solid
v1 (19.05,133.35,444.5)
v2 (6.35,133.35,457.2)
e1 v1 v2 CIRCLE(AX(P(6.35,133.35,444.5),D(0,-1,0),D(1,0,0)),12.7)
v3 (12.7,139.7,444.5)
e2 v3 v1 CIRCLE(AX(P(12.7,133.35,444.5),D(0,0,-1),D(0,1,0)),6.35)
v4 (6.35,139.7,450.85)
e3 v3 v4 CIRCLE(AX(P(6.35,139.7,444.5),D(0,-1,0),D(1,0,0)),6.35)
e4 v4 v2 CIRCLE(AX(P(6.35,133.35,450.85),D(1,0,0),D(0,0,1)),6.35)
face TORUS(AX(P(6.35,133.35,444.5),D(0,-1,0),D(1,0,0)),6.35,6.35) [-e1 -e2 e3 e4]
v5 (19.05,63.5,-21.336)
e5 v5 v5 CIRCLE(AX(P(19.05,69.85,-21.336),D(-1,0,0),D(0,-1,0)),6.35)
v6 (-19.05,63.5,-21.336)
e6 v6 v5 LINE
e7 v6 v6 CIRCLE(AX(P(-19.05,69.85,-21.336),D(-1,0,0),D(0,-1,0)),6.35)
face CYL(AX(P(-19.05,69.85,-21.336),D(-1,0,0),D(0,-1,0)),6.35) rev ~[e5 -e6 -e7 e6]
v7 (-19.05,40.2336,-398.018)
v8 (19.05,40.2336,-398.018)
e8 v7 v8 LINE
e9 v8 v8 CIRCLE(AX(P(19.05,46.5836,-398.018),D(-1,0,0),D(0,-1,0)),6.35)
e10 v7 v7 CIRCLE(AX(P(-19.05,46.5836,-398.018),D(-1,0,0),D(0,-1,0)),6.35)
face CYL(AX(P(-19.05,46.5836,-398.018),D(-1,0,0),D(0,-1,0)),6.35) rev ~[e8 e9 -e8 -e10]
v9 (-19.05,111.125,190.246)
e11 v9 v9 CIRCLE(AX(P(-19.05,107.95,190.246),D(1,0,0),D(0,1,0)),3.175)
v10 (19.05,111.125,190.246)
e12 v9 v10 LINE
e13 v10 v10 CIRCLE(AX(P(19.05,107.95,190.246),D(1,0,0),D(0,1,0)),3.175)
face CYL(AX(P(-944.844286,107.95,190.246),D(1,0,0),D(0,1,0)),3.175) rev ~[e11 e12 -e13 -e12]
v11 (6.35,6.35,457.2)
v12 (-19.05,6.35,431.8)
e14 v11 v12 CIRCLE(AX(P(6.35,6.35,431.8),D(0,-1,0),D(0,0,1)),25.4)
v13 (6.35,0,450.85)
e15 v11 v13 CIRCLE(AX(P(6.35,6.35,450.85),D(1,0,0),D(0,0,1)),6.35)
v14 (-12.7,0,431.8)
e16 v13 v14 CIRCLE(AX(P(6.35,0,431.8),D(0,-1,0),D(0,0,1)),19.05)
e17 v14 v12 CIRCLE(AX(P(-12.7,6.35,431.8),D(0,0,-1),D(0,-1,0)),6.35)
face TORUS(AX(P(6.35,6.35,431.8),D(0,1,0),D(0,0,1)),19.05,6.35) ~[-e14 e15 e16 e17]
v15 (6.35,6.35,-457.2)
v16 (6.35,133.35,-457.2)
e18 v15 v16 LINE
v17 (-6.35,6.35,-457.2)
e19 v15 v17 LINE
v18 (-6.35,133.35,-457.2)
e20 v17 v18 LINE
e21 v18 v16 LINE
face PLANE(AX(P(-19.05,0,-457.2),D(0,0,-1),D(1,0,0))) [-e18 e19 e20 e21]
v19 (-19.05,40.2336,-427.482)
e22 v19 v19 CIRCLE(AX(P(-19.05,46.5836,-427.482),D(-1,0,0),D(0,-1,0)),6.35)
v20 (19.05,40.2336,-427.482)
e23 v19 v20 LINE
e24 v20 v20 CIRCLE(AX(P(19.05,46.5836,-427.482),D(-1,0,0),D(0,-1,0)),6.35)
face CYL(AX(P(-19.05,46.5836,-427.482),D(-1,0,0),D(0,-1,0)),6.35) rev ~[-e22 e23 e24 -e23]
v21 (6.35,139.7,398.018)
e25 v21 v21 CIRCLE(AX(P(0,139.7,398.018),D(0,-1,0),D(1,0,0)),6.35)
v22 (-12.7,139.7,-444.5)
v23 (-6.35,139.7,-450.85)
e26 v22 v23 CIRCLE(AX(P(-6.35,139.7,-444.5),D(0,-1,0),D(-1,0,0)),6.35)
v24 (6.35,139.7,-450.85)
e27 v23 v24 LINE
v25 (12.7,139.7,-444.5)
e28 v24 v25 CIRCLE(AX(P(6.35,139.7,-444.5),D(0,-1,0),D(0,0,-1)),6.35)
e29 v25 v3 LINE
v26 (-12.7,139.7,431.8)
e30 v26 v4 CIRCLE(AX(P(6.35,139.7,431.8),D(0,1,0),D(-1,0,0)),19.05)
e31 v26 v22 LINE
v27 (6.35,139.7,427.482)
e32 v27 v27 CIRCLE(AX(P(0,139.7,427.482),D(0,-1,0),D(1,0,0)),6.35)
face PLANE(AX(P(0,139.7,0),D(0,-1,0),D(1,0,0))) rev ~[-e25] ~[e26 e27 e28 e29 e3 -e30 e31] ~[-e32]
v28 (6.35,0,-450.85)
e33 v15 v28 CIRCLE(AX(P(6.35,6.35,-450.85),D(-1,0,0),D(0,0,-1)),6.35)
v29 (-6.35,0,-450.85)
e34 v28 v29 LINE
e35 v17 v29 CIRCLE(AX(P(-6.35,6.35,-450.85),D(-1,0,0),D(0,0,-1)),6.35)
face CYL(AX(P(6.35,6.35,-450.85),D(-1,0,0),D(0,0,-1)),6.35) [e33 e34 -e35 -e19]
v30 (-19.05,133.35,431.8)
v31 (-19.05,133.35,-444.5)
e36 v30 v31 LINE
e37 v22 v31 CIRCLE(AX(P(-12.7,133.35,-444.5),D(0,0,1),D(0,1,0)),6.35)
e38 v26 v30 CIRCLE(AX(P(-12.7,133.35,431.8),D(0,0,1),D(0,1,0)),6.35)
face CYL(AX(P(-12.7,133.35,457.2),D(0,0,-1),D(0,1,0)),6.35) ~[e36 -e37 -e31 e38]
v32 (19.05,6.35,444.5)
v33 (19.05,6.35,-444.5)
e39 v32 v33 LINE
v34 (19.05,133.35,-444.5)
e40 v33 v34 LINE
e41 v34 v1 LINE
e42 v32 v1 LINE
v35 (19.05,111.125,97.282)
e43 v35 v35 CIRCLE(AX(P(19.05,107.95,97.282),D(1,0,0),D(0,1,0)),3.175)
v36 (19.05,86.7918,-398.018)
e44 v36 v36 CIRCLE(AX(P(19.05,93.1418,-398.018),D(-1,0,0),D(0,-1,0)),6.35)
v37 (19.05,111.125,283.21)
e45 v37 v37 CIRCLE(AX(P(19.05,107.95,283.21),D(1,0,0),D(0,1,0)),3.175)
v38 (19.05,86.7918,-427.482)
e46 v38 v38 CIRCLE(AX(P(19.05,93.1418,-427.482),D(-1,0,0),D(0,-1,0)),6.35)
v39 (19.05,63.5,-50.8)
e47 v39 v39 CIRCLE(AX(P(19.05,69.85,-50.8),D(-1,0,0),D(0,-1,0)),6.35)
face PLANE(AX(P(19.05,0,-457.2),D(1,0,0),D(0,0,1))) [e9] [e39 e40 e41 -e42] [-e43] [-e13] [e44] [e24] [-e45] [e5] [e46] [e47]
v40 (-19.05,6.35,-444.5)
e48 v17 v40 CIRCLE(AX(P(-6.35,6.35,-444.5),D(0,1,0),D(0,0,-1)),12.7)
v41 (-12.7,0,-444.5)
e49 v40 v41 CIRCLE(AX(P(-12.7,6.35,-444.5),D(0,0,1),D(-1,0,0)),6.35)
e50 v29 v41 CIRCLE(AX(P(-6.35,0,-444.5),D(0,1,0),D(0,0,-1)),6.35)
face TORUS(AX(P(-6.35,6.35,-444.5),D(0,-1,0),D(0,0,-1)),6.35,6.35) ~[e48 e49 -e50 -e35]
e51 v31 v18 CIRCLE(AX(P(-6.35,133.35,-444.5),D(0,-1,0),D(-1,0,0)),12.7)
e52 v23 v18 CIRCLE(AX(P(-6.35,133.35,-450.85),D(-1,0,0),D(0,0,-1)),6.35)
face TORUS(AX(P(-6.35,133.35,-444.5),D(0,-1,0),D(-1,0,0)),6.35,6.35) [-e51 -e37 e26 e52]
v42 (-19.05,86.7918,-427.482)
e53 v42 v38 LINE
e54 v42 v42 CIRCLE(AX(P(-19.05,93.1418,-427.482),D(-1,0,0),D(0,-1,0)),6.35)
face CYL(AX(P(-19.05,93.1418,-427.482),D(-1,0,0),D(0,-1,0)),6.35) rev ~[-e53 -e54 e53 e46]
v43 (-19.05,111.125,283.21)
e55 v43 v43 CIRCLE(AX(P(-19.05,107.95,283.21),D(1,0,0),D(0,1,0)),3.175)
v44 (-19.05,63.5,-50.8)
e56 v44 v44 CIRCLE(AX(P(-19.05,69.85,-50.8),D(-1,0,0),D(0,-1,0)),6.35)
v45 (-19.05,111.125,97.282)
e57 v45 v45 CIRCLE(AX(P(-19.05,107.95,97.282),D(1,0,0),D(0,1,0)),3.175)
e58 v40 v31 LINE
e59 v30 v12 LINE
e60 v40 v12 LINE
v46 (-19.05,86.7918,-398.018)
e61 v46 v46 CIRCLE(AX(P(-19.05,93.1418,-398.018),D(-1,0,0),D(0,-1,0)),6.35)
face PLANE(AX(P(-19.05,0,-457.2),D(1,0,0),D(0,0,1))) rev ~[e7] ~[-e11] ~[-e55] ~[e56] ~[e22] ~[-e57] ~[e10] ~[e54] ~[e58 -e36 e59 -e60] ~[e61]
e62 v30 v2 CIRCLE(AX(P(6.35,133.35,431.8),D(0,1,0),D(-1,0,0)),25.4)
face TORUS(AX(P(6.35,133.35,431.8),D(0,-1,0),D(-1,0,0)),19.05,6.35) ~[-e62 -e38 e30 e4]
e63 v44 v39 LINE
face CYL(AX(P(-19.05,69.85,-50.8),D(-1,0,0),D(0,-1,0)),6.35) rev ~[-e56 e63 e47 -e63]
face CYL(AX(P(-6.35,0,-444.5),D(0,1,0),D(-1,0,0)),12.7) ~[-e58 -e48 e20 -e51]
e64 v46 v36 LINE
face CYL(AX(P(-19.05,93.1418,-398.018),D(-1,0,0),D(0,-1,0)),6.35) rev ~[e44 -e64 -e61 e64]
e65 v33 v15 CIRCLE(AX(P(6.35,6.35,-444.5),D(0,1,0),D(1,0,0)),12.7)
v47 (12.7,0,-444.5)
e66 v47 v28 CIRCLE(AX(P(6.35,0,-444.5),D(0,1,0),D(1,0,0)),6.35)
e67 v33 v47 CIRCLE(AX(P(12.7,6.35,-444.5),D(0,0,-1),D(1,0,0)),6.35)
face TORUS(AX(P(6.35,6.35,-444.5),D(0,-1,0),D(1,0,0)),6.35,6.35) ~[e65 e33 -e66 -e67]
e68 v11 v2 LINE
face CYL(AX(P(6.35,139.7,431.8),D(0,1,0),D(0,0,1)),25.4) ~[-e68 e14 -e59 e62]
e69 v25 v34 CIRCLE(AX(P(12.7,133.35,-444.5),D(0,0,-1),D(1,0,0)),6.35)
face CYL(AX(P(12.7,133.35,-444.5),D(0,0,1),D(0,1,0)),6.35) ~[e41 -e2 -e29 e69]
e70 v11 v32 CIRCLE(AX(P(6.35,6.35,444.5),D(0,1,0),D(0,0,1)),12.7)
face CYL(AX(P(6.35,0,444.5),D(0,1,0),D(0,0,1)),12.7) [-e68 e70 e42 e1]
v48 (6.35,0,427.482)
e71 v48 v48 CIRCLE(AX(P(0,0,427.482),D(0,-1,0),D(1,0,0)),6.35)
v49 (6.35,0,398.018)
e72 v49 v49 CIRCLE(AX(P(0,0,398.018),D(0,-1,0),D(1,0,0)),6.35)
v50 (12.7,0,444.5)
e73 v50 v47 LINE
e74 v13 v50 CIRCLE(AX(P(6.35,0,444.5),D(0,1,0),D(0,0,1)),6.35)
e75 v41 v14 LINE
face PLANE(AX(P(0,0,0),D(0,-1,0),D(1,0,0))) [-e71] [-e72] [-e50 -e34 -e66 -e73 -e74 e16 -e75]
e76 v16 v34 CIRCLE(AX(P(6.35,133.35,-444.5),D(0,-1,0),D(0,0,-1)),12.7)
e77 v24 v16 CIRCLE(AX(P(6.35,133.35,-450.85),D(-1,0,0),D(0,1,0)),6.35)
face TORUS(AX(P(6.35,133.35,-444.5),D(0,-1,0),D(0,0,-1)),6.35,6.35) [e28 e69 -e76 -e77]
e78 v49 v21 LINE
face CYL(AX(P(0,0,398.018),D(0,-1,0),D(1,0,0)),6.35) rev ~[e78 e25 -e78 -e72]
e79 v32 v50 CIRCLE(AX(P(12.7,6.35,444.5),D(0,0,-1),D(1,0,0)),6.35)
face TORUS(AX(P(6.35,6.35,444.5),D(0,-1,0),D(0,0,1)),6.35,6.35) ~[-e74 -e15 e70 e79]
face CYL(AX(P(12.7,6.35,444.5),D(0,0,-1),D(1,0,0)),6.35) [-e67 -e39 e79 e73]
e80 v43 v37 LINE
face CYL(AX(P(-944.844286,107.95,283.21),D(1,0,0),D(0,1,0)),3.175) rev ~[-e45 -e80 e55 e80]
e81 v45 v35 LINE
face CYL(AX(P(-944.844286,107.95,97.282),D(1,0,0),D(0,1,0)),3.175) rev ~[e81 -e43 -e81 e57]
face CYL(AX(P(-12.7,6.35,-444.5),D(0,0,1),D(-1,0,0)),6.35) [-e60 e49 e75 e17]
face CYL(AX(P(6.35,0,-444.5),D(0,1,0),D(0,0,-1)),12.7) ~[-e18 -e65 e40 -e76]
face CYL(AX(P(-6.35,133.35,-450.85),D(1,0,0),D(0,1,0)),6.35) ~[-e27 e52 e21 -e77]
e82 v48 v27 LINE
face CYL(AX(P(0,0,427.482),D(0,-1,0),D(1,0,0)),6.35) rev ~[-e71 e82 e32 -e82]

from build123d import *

# Parameters (mm, degrees)
F0_W        = 38.1
F0_H        = 914.4
F0_R        = 6.35
F1_DEPTH    = 139.7
F2_R        = 6.35
F3_DEPTH    = 38.1
F6_R        = 6.35
F7_DEPTH    = 38.1
F8_D        = 6.35
F4_R        = 12.7
F5_R        = 6.35
F9_T1_DEPTH = 139.7
F9_T4_ANGLE = 90
F9_T6_ANGLE = 90


# Not quite as in the source:
# - a fillet or chamfer that OpenCascade refuses, or shapes differently, is made with other operations: its cross-section is extruded or revolved along the edge and cut away or added


with BuildPart() as f1:
    # F0 (on Front) → F1 (new body)
    with BuildSketch(Plane.XZ):
        Rectangle(F0_W, F0_H)
        with Locations((0, 398.018)):
            Circle(F0_R, mode=Mode.SUBTRACT)
        with Locations((0, 427.482)):
            Circle(F0_R, mode=Mode.SUBTRACT)
    extrude(amount=-F1_DEPTH)

    # F2 (on face) → F3 (cut)
    with BuildSketch(Plane(origin=(-19.05, 0, 0), x_dir=(0, -1, 0), z_dir=(-1, 0, 0))):
        with Locations((-93.1418, -427.482)):
            Circle(F2_R)
        with Locations((-93.1418, -398.018)):
            Circle(F2_R)
        with Locations((-46.5836, -427.482)):
            Circle(F2_R)
        with Locations((-46.5836, -398.018)):
            Circle(F2_R)
    extrude(amount=-F3_DEPTH, mode=Mode.SUBTRACT)

    # F6 (on face) → F7 (cut)
    with BuildSketch(Plane(origin=(-19.05, 0, 0), x_dir=(0, -1, 0), z_dir=(-1, 0, 0))):
        with Locations((-69.85, -21.336)):
            Circle(F6_R)
        with Locations((-69.85, -50.8)):
            Circle(F6_R)
    extrude(amount=-F7_DEPTH, mode=Mode.SUBTRACT)

    # F8 (through all)
    with Locations(Plane(origin=(-19.05, 0, 0), x_dir=(0, -1, 0), z_dir=(-1, 0, 0))):
        with Locations((-107.95, 283.21), (-107.95, 190.246), (-107.95, 97.282)):
            Hole(F8_D / 2)

    # F4
    f4_edges = [f1.edges().sort_by_distance(p)[0] for p in [
        (19.05, 69.85, 457.2),
        (-19.05, 69.85, -457.2),
        (19.05, 69.85, -457.2),
    ]]
    fillet(f4_edges, radius=F4_R)

    # F5
    f5_edges = [f1.edges().sort_by_distance(p)[0] for p in [
        (-19.05, 0, 6.35),
        (19.05, 0, 0),
        (19.05, 139.7, 0),
    ]]
    fillet(f5_edges, radius=F5_R)

    # F9: fillet of radius 25.4 on 1 edges, made by hand

    # F9_s2 → F9_t1 (cut)
    with BuildSketch(Plane.XZ.offset(-139.7)):
        with BuildLine():
            ThreePointArc((6.35, 457.2), (-11.6105122421, 449.7605122421), (-19.05, 431.8))
            Line((-19.05, 431.8), (-19.05, 457.2))
            Line((-19.05, 457.2), (6.35, 457.2))
        make_face()
    extrude(amount=F9_T1_DEPTH, mode=Mode.SUBTRACT)

    # F9_s3 → F9_t4 (revolve, cut)
    with BuildSketch(Plane.YZ.offset(6.35)):
        with BuildLine():
            ThreePointArc((0, 450.85), (1.8598719395, 455.3401280605), (6.35, 457.2))
            Line((6.35, 457.2), (0, 457.2))
            Line((0, 457.2), (0, 450.85))
        make_face()
    revolve(axis=Axis((6.35, 0, 431.8), (0, -1, 0)), revolution_arc=F9_T4_ANGLE, mode=Mode.SUBTRACT)

    # F9_s5 → F9_t6 (revolve, cut)
    with BuildSketch(Plane.XY.offset(431.8)):
        with BuildLine():
            ThreePointArc((-12.7, 139.7), (-17.1901280605, 137.8401280605), (-19.05, 133.35))
            Line((-19.05, 133.35), (-19.05, 139.7))
            Line((-19.05, 139.7), (-12.7, 139.7))
        make_face()
    revolve(axis=Axis((6.35, 139.7, 431.8), (0, 1, 0)), revolution_arc=F9_T6_ANGLE, mode=Mode.SUBTRACT)


solid = f1.part
